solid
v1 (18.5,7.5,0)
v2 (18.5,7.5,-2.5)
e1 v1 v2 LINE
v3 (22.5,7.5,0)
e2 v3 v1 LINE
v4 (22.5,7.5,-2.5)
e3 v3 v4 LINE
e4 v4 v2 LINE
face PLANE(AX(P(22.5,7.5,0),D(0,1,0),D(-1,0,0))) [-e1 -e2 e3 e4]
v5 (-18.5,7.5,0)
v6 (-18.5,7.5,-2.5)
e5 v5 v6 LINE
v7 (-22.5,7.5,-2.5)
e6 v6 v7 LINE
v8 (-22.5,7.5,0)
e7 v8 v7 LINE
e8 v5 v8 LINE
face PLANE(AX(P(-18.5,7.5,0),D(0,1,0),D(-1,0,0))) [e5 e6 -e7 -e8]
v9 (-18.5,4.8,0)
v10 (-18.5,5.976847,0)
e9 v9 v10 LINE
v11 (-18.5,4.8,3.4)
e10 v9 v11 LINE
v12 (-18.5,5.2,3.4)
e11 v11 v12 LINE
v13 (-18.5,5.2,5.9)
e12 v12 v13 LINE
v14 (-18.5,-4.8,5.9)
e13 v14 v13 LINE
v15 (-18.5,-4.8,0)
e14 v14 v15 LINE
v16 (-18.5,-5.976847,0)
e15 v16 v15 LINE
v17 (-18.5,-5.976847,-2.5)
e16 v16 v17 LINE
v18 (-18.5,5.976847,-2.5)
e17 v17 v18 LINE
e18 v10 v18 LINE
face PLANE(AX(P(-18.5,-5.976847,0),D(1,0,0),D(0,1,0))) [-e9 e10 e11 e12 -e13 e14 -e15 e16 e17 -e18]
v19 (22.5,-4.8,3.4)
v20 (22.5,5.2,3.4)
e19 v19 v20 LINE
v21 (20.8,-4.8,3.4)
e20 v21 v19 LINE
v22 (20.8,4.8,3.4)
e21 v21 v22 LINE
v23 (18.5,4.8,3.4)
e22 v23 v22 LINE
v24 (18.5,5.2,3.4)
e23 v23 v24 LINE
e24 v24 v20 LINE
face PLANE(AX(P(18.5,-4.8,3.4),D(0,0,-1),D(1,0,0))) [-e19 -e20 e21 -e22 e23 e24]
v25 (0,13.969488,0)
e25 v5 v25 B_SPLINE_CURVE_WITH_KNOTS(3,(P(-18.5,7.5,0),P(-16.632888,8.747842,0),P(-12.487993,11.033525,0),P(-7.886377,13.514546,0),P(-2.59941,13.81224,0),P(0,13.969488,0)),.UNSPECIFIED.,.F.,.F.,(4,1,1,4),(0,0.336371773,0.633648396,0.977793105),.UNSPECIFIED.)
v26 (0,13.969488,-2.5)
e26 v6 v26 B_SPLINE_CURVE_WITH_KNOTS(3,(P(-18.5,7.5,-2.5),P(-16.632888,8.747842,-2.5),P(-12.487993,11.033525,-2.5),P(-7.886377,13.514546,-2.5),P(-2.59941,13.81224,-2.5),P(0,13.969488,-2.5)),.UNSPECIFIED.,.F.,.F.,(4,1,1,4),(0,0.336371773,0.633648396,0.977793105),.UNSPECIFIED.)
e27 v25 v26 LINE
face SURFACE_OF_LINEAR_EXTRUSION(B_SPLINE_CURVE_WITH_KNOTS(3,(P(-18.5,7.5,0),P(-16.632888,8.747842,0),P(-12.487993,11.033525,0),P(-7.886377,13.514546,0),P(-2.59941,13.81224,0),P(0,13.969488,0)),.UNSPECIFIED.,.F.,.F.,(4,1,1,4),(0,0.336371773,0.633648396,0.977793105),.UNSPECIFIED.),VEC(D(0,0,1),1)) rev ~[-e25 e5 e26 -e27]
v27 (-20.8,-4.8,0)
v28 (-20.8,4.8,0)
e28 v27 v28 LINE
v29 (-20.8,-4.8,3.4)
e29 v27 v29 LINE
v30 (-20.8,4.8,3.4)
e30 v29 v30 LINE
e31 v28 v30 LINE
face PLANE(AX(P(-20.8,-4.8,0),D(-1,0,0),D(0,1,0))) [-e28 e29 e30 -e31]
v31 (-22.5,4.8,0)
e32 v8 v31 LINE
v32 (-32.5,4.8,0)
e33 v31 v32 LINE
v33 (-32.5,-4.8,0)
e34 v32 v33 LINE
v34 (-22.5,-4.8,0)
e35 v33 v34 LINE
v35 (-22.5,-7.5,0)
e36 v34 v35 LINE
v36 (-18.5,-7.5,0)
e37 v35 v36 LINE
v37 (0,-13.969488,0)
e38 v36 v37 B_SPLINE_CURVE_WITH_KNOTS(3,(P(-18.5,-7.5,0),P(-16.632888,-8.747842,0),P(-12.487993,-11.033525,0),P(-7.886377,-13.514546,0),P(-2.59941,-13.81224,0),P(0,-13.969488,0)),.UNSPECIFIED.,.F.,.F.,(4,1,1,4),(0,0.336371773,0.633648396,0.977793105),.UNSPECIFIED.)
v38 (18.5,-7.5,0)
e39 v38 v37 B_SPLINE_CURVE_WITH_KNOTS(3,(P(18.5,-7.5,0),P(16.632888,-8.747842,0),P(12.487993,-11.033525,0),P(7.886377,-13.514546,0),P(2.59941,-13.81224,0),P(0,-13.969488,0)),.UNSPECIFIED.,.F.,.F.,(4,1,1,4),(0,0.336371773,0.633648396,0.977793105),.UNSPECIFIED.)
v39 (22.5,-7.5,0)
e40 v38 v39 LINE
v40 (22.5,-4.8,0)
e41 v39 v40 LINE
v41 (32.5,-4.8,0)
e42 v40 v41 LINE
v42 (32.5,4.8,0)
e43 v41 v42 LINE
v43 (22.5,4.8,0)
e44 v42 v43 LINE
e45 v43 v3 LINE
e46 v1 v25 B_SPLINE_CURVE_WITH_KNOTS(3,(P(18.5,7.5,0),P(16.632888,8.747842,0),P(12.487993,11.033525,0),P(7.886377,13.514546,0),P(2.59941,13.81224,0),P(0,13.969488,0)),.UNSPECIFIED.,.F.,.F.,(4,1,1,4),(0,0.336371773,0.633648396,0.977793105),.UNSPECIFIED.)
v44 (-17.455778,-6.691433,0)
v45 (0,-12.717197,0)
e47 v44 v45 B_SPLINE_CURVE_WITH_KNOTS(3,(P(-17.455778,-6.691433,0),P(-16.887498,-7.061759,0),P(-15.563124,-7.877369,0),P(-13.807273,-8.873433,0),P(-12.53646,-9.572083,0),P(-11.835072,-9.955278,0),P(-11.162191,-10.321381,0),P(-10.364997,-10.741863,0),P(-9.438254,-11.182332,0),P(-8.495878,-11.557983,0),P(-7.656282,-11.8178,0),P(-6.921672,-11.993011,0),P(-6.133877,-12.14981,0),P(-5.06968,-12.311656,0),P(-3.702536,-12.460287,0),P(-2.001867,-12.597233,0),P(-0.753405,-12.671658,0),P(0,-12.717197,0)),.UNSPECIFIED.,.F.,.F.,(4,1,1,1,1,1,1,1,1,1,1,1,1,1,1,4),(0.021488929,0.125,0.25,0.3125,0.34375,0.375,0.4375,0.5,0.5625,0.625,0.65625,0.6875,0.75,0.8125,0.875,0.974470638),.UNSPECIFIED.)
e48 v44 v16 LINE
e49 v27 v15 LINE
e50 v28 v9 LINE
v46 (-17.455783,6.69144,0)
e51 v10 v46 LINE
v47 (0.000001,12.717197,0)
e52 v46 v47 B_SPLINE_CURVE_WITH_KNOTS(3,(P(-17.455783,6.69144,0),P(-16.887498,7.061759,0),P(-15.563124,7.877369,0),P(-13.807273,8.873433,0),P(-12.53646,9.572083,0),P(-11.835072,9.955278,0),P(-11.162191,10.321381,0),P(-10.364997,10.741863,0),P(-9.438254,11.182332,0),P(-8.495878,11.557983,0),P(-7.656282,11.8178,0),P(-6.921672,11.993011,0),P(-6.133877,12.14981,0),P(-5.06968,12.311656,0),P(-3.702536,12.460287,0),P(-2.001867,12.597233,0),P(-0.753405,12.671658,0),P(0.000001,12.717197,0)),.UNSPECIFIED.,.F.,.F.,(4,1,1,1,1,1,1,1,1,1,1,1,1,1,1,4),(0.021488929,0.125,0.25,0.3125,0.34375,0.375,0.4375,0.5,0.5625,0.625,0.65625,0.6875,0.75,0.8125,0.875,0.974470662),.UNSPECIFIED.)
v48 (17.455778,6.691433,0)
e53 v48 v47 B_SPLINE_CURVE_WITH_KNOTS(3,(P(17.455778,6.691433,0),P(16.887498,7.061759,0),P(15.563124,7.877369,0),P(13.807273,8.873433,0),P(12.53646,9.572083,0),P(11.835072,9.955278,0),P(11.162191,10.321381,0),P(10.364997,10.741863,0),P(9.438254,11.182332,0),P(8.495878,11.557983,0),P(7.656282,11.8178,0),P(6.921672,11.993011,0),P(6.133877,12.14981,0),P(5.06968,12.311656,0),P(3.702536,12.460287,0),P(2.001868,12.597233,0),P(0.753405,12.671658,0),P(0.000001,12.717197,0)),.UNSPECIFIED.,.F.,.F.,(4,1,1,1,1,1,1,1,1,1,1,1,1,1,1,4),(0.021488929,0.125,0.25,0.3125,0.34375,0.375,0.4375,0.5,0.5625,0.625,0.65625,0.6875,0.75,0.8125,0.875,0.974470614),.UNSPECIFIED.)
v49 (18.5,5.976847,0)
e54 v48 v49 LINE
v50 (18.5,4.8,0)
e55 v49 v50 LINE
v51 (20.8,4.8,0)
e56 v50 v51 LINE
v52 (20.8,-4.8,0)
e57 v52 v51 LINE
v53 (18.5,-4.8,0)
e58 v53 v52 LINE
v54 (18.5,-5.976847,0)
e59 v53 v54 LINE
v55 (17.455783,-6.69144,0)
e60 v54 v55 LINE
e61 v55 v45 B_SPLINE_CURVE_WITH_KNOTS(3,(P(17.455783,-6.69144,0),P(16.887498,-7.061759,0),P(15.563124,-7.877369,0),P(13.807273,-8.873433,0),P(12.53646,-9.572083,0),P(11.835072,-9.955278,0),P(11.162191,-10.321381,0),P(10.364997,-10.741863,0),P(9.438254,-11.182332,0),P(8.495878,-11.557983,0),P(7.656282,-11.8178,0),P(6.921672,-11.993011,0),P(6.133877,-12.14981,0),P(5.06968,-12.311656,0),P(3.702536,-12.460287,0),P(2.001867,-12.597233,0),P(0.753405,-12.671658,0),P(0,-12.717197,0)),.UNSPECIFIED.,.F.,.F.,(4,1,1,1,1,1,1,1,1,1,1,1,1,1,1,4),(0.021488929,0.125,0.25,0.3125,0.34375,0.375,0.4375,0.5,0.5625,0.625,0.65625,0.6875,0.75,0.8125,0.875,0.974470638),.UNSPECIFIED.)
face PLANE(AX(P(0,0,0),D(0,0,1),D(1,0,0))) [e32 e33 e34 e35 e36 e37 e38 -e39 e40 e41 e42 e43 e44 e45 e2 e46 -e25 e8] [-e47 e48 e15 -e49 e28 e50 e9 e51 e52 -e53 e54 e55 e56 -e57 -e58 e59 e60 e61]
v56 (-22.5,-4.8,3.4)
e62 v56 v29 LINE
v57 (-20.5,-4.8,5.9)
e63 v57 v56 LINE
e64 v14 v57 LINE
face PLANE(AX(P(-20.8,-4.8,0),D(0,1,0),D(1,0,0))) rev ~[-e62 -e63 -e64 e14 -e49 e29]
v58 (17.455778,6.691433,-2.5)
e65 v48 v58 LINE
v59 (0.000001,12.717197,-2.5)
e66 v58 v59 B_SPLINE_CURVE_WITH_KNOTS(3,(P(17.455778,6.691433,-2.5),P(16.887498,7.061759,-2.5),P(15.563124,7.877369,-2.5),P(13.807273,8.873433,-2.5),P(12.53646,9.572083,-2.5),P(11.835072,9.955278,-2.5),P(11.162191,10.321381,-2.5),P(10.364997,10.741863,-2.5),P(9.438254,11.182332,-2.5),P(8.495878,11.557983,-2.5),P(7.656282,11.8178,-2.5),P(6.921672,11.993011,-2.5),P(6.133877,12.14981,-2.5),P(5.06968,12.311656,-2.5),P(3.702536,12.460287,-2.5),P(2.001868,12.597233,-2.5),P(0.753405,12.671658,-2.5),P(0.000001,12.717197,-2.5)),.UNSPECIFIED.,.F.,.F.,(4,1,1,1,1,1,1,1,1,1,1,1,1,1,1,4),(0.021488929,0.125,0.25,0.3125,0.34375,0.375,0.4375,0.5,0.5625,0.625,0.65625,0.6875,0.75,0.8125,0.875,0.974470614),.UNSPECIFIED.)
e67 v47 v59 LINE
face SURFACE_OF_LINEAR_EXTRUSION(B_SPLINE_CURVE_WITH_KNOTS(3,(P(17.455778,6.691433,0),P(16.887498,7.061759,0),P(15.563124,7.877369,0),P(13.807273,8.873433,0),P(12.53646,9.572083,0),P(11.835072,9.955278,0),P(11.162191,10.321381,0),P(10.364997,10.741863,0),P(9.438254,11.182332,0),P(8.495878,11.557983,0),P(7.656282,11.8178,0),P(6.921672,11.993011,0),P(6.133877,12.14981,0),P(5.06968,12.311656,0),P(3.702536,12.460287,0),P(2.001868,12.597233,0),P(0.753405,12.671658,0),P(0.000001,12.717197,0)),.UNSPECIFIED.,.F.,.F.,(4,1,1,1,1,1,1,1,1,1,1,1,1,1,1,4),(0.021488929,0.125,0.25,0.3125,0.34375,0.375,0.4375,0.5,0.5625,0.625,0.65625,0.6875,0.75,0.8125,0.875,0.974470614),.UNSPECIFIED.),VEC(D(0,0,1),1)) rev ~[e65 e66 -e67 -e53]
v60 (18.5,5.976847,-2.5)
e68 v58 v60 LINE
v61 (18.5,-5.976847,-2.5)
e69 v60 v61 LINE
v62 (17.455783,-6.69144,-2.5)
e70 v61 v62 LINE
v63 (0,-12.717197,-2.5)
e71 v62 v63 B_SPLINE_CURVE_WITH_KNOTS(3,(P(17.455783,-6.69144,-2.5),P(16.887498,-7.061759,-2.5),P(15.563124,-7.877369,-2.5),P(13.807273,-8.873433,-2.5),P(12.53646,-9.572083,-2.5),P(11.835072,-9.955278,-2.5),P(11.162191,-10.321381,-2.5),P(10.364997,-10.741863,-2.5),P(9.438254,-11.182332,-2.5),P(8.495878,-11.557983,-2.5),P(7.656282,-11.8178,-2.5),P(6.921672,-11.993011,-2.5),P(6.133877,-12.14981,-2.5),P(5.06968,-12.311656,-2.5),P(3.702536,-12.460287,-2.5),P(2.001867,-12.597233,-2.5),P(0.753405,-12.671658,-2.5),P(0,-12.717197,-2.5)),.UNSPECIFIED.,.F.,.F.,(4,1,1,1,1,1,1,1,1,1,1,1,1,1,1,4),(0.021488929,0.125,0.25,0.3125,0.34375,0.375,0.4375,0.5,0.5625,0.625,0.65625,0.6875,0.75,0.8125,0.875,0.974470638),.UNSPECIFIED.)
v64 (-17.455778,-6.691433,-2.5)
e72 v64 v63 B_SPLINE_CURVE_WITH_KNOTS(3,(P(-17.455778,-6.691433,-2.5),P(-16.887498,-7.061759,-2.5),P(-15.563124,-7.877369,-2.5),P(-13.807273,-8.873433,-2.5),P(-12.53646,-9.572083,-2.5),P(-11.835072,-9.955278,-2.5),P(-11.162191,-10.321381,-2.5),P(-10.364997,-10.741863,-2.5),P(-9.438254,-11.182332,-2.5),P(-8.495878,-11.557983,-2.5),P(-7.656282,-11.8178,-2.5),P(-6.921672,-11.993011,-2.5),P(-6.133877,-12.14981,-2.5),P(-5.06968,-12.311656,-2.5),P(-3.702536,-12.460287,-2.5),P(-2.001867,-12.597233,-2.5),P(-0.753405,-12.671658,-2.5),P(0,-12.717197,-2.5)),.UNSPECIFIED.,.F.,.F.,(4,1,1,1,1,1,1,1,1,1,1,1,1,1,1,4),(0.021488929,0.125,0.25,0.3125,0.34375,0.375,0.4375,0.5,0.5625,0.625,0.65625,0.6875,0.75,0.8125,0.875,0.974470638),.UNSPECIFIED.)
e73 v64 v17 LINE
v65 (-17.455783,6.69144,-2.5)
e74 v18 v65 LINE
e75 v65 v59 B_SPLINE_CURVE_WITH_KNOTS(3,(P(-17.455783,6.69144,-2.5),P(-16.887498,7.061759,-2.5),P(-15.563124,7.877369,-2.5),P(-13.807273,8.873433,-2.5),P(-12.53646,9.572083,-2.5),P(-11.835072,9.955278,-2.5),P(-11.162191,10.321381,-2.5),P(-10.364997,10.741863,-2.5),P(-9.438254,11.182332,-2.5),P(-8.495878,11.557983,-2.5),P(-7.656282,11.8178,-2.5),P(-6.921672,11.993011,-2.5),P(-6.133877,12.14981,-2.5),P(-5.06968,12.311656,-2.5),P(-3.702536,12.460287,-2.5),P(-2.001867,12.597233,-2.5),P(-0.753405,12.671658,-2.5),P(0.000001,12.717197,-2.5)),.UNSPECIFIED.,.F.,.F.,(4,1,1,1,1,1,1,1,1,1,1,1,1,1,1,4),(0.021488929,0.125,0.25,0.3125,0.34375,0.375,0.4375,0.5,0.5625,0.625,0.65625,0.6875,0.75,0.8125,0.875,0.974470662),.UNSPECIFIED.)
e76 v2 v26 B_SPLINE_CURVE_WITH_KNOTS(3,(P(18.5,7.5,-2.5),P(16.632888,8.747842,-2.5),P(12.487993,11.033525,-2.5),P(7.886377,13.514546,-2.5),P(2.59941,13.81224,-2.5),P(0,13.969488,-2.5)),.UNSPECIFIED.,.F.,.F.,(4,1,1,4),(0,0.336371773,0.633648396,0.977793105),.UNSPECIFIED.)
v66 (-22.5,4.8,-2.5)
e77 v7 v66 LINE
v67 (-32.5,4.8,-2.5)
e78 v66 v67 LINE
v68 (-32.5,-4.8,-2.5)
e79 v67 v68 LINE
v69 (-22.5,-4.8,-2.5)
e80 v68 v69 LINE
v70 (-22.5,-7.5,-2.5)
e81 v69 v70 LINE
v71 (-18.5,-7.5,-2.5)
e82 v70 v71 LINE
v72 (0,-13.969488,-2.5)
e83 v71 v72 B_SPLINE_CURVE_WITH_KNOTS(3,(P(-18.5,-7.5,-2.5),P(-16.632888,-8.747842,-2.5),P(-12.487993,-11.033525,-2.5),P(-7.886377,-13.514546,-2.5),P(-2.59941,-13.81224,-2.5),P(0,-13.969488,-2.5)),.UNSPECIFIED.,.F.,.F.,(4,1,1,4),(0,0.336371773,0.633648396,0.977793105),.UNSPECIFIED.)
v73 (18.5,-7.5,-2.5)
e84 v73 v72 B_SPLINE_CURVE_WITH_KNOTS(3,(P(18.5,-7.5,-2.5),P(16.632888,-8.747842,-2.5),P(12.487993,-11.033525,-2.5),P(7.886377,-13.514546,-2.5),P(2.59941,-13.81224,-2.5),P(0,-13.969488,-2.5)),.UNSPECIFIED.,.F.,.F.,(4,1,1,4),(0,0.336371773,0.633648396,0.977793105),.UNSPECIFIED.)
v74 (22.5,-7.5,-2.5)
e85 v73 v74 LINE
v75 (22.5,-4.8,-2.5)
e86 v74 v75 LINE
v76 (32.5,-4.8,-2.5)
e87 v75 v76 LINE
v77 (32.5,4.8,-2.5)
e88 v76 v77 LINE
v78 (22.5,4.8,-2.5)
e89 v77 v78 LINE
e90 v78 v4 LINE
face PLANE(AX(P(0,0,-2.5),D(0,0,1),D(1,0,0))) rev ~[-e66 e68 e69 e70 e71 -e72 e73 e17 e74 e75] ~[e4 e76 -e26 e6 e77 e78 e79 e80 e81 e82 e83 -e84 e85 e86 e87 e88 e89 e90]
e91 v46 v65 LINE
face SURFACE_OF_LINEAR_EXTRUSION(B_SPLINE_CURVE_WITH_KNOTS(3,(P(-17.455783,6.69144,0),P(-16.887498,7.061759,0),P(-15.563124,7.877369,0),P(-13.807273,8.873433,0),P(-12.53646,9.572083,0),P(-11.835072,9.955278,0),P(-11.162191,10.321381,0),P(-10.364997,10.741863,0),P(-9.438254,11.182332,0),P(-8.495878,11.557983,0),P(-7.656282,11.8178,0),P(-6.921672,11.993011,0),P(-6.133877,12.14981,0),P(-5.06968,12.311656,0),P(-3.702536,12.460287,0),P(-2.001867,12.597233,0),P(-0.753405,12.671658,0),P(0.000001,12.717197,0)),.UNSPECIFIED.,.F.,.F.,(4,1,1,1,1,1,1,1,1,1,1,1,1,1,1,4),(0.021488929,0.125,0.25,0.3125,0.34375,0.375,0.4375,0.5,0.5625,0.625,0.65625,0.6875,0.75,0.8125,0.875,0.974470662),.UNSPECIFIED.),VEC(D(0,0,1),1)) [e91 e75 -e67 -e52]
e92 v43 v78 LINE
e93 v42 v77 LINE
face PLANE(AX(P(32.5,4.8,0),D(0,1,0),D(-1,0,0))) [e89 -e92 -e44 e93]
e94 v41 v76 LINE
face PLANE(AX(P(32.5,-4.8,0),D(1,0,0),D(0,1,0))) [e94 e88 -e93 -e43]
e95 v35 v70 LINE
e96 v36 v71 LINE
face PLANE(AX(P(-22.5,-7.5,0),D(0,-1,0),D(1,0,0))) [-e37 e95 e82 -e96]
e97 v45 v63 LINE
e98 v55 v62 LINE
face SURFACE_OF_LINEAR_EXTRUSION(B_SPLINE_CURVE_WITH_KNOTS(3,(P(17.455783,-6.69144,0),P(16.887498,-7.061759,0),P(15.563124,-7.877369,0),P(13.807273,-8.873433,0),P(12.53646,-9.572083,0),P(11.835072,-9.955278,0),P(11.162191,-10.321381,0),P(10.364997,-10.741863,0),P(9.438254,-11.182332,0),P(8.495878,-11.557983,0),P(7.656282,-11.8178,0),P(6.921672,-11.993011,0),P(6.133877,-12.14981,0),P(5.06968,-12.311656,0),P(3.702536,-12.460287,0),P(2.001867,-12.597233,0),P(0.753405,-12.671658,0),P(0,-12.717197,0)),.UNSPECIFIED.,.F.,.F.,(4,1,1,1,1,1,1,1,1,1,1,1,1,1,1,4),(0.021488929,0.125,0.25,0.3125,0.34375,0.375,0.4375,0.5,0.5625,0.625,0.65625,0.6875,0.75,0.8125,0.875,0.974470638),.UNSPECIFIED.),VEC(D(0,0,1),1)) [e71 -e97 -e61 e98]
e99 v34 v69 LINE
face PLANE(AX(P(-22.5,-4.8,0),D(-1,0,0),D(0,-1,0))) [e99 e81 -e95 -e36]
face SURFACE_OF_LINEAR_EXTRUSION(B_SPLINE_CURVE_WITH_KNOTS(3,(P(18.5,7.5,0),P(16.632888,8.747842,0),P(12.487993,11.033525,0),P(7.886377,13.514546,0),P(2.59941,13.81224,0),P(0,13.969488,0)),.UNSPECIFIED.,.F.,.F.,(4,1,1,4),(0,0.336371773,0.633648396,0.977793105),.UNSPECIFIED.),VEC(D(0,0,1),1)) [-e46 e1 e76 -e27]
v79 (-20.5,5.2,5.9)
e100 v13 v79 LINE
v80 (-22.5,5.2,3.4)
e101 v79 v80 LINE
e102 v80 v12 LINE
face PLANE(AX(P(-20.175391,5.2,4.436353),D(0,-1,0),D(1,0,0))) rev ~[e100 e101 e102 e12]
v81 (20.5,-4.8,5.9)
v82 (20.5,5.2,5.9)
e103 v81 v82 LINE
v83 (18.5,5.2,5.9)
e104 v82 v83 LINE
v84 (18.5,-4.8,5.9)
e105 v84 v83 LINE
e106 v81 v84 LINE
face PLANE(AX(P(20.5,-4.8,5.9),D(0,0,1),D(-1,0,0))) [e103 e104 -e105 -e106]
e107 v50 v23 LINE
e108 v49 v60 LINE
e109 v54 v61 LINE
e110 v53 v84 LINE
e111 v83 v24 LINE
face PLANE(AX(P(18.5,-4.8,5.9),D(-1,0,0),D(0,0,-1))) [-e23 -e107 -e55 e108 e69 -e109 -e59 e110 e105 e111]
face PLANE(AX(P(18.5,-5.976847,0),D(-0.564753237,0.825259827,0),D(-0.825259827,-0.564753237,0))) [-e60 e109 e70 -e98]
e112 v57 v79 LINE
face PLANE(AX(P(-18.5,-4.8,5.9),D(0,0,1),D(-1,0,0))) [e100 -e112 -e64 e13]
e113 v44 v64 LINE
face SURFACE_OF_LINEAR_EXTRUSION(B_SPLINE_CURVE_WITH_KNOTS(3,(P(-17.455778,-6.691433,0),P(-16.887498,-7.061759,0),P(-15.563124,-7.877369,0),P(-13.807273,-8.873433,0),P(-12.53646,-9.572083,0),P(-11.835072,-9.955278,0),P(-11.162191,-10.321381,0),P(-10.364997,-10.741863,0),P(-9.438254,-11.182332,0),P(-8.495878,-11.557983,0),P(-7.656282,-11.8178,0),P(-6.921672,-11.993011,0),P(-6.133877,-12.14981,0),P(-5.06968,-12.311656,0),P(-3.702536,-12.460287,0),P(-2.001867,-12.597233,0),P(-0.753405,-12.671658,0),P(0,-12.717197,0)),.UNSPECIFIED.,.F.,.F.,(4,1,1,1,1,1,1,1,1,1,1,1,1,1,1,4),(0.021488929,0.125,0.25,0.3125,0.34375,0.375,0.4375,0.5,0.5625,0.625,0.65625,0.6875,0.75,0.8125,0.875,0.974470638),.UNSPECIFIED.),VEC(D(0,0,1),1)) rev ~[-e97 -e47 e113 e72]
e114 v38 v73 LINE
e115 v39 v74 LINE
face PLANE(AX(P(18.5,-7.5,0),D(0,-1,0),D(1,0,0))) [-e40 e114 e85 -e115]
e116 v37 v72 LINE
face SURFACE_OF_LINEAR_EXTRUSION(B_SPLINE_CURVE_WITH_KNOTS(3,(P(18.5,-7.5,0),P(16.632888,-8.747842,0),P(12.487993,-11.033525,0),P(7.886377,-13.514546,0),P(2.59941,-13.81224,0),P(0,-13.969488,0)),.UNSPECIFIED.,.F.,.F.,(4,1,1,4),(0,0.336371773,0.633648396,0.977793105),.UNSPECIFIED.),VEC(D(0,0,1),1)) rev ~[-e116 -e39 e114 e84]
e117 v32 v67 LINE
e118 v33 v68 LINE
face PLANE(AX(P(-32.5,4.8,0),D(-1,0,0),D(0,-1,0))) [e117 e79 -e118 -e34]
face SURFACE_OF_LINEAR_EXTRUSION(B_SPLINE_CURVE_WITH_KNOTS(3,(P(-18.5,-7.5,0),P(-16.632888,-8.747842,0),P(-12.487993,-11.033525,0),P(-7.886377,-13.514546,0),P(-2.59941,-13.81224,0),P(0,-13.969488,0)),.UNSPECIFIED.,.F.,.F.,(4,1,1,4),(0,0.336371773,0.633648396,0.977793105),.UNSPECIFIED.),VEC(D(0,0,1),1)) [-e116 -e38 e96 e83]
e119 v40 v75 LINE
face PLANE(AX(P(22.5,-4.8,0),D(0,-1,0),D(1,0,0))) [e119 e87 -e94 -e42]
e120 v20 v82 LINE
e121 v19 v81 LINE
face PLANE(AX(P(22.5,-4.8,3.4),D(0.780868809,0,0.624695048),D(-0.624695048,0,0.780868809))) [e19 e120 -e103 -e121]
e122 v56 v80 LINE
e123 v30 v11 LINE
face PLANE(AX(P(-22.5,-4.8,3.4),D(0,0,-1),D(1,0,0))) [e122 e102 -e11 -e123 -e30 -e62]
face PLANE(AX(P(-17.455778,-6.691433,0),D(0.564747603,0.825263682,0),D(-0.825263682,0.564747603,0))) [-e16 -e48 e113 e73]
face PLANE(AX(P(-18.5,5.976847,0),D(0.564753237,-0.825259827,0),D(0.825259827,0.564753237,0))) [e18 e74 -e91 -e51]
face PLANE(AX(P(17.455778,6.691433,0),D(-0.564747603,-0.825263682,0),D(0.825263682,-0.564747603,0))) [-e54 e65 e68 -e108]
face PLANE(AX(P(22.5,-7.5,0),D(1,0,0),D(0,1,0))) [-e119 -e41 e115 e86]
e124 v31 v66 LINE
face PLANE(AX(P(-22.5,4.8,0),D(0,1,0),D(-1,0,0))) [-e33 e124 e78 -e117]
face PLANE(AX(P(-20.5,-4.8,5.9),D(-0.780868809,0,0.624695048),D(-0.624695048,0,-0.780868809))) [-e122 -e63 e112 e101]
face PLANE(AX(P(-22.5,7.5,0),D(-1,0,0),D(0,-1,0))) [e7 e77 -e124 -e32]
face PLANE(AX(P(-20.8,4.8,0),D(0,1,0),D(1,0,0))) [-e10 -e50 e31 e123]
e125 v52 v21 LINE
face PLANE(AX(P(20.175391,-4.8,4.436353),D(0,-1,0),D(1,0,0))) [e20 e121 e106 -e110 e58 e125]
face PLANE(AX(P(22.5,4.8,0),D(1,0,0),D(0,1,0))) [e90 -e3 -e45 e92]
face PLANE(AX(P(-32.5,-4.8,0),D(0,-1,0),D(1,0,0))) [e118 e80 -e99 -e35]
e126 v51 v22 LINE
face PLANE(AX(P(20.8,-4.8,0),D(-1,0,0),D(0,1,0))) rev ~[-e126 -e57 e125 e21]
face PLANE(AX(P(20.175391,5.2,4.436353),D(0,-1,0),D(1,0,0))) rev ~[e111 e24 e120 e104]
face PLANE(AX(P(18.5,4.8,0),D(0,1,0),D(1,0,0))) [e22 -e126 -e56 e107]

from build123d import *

# Parameters (mm, degrees)
F1_DEPTH = 2.5
F2_W     = 2.3
F2_H     = 9.6
F3_DEPTH = 3.4
F5_DEPTH = 10


# Not quite as in the source:
# - ends of sketch curves that miss each other by under 0.0002 mm in the source are joined
# - the dataset's text gives a spline's control points without its knots; the knots are read off the source's solid


with BuildPart() as f1:
    # F0 (on Top) → F1 (new body)
    with BuildSketch(Plane.XY):
        with BuildLine():
            Line((32.5, -4.8), (32.5, 0))
            Line((32.5, 0), (32.5, 4.8))
            Line((32.5, 4.8), (22.5, 4.8))
            Line((22.5, 4.8), (22.5, 7.5))
            Line((22.5, 7.5), (18.5, 7.5))
            add(Edge.make_bspline(
                [(18.5, 7.5), (16.6328875571, 8.7478424674), (12.4879926615, 11.0335251601), (7.8863773573, 13.5145464122), (2.5994103613, 13.8122400643), (0, 13.9694881193)],
                knots=[0, 0, 0, 0, 0.3363717727, 0.6336483956, 0.9777931055, 0.9777931055, 0.9777931055, 0.9777931055], degree=3))
            add(Edge.make_bspline(
                [(-18.5, 7.5), (-16.6328875571, 8.7478424674), (-12.4879926615, 11.0335251601), (-7.8863773573, 13.5145464122), (-2.5994103613, 13.8122400643), (0, 13.9694881193)],
                knots=[0, 0, 0, 0, 0.3363717727, 0.6336483956, 0.9777931055, 0.9777931055, 0.9777931055, 0.9777931055], degree=3))
            Line((-18.5, 7.5), (-22.5, 7.5))
            Line((-22.5, 7.5), (-22.5, 4.8))
            Line((-22.5, 4.8), (-32.5, 4.8))
            Line((-32.5, 4.8), (-32.5, 0))
            Line((-32.5, 0), (-32.5, -4.8))
            Line((-32.5, -4.8), (-22.5, -4.8))
            Line((-22.5, -4.8), (-22.5, -7.5))
            Line((-22.5, -7.5), (-18.5, -7.5))
            add(Edge.make_bspline(
                [(-18.5, -7.5), (-16.6328875571, -8.7478424674), (-12.4879926615, -11.0335251601), (-7.8863773573, -13.5145464122), (-2.5994103613, -13.8122400643), (0, -13.9694881193)],
                knots=[0, 0, 0, 0, 0.3363717727, 0.6336483956, 0.9777931055, 0.9777931055, 0.9777931055, 0.9777931055], degree=3))
            add(Edge.make_bspline(
                [(18.5, -7.5), (16.6328875571, -8.7478424674), (12.4879926615, -11.0335251601), (7.8863773573, -13.5145464122), (2.5994103613, -13.8122400643), (0, -13.9694881193)],
                knots=[0, 0, 0, 0, 0.3363717727, 0.6336483956, 0.9777931055, 0.9777931055, 0.9777931055, 0.9777931055], degree=3))
            Line((18.5, -7.5), (22.5, -7.5))
            Line((22.5, -7.5), (22.5, -4.8))
            Line((22.5, -4.8), (32.5, -4.8))
        make_face()
        with BuildLine():
            Line((-18.5, 0), (-18.5, 5.9768469073))
            Line((-18.5, 5.9768469073), (-17.4557828979, 6.6914400202))
            add(Edge.make_bspline(
                [(-17.4557828979, 6.6914400202), (-16.8874977541, 7.0617589277), (-15.5631242254, 7.8773690533), (-13.8072733089, 8.8734333253), (-12.5364597536, 9.5720832259), (-11.8350717008, 9.9552778211), (-11.1621909622, 10.3213808687), (-10.364996594, 10.7418634519), (-9.4382542316, 11.1823324733), (-8.4958782817, 11.5579825068), (-7.6562822144, 11.8178001131), (-6.921672188, 11.9930107338), (-6.1338774618, 12.1498095188), (-5.0696801932, 12.3116557143), (-3.7025355233, 12.4602871457), (-2.0018671704, 12.5972327818), (-0.7534045854, 12.6716577772), (5.394e-07, 12.717197038)],
                knots=[0.0214889286, 0.0214889286, 0.0214889286, 0.0214889286, 0.125, 0.25, 0.3125, 0.34375, 0.375, 0.4375, 0.5, 0.5625, 0.625, 0.65625, 0.6875, 0.75, 0.8125, 0.875, 0.9744706617, 0.9744706617, 0.9744706617, 0.9744706617], degree=3))
            add(Edge.make_bspline(
                [(17.4557781808, 6.6914327816), (16.8874977541, 7.0617589277), (15.5631242254, 7.8773690533), (13.8072733089, 8.8734333253), (12.5364597536, 9.5720832259), (11.8350717008, 9.9552778211), (11.1621909622, 10.3213808687), (10.364996594, 10.7418634519), (9.4382542316, 11.1823324733), (8.4958782817, 11.5579825068), (7.6562822144, 11.8178001131), (6.921672188, 11.9930107338), (6.1338774618, 12.1498095188), (5.0696801932, 12.3116557143), (3.7025355233, 12.4602871457), (2.0018675288, 12.597232753), (0.7534053146, 12.6716577338), (5.394e-07, 12.717197038)],
                knots=[0.0214889286, 0.0214889286, 0.0214889286, 0.0214889286, 0.125, 0.25, 0.3125, 0.34375, 0.375, 0.4375, 0.5, 0.5625, 0.625, 0.65625, 0.6875, 0.75, 0.8125, 0.875, 0.9744706144, 0.9744706144, 0.9744706144, 0.9744706144], degree=3))
            Line((17.4557781808, 6.6914327816), (18.5, 5.9768469073))
            Line((18.5, 5.9768469073), (18.5, 5))
            Line((18.5, 5), (18.5, 0))
            Line((18.5, 0), (18.5, -5.9768469073))
            Line((18.5, -5.9768469073), (17.4557828979, -6.6914400202))
            add(Edge.make_bspline(
                [(17.4557828979, -6.6914400202), (16.8874977541, -7.0617589277), (15.5631242254, -7.8773690533), (13.8072733089, -8.8734333253), (12.5364597536, -9.5720832259), (11.8350717008, -9.9552778211), (11.1621909622, -10.3213808687), (10.364996594, -10.7418634519), (9.4382542316, -11.1823324733), (8.4958782817, -11.5579825068), (7.6562822144, -11.8178001131), (6.921672188, -11.9930107338), (6.1338774618, -12.1498095188), (5.0696801932, -12.3116557143), (3.7025355233, -12.4602871457), (2.0018673502, -12.5972327673), (0.7534049513, -12.6716577554), (0, -12.7171970054)],
                knots=[0.0214889286, 0.0214889286, 0.0214889286, 0.0214889286, 0.125, 0.25, 0.3125, 0.34375, 0.375, 0.4375, 0.5, 0.5625, 0.625, 0.65625, 0.6875, 0.75, 0.8125, 0.875, 0.974470638, 0.974470638, 0.974470638, 0.974470638], degree=3))
            add(Edge.make_bspline(
                [(-17.4557781808, -6.6914327816), (-16.8874977541, -7.0617589277), (-15.5631242254, -7.8773690533), (-13.8072733089, -8.8734333253), (-12.5364597536, -9.5720832259), (-11.8350717008, -9.9552778211), (-11.1621909622, -10.3213808687), (-10.364996594, -10.7418634519), (-9.4382542316, -11.1823324733), (-8.4958782817, -11.5579825068), (-7.6562822144, -11.8178001131), (-6.921672188, -11.9930107338), (-6.1338774618, -12.1498095188), (-5.0696801932, -12.3116557143), (-3.7025355233, -12.4602871457), (-2.0018673502, -12.5972327673), (-0.7534049513, -12.6716577554), (0, -12.7171970054)],
                knots=[0.0214889286, 0.0214889286, 0.0214889286, 0.0214889286, 0.125, 0.25, 0.3125, 0.34375, 0.375, 0.4375, 0.5, 0.5625, 0.625, 0.65625, 0.6875, 0.75, 0.8125, 0.875, 0.974470638, 0.974470638, 0.974470638, 0.974470638], degree=3))
            Line((-17.4557781808, -6.6914327816), (-18.5, -5.9768469073))
            Line((-18.5, -5.9768469073), (-18.5, 0))
        make_face(mode=Mode.SUBTRACT)
    extrude(amount=-F1_DEPTH)

    # F2 (on face) → F3 (join)
    with BuildSketch(Plane.XY):
        with Locations((19.65, 0)):
            Rectangle(F2_W, F2_H)
        with Locations((-19.65, 0)):
            Rectangle(F2_W, F2_H)
    extrude(amount=F3_DEPTH)

    # F4 (on face) → F5 (join)
    with BuildSketch(Plane.XZ.offset(4.8)):
        Polygon((18.5, 5.9), (18.5, 3.4), (22.5, 3.4), (20.5, 5.9), align=None)
        Polygon((-20.5, 5.9), (-22.5, 3.4), (-18.5, 3.4), (-18.5, 5.9), align=None)
    extrude(amount=-F5_DEPTH)


solid = f1.part
